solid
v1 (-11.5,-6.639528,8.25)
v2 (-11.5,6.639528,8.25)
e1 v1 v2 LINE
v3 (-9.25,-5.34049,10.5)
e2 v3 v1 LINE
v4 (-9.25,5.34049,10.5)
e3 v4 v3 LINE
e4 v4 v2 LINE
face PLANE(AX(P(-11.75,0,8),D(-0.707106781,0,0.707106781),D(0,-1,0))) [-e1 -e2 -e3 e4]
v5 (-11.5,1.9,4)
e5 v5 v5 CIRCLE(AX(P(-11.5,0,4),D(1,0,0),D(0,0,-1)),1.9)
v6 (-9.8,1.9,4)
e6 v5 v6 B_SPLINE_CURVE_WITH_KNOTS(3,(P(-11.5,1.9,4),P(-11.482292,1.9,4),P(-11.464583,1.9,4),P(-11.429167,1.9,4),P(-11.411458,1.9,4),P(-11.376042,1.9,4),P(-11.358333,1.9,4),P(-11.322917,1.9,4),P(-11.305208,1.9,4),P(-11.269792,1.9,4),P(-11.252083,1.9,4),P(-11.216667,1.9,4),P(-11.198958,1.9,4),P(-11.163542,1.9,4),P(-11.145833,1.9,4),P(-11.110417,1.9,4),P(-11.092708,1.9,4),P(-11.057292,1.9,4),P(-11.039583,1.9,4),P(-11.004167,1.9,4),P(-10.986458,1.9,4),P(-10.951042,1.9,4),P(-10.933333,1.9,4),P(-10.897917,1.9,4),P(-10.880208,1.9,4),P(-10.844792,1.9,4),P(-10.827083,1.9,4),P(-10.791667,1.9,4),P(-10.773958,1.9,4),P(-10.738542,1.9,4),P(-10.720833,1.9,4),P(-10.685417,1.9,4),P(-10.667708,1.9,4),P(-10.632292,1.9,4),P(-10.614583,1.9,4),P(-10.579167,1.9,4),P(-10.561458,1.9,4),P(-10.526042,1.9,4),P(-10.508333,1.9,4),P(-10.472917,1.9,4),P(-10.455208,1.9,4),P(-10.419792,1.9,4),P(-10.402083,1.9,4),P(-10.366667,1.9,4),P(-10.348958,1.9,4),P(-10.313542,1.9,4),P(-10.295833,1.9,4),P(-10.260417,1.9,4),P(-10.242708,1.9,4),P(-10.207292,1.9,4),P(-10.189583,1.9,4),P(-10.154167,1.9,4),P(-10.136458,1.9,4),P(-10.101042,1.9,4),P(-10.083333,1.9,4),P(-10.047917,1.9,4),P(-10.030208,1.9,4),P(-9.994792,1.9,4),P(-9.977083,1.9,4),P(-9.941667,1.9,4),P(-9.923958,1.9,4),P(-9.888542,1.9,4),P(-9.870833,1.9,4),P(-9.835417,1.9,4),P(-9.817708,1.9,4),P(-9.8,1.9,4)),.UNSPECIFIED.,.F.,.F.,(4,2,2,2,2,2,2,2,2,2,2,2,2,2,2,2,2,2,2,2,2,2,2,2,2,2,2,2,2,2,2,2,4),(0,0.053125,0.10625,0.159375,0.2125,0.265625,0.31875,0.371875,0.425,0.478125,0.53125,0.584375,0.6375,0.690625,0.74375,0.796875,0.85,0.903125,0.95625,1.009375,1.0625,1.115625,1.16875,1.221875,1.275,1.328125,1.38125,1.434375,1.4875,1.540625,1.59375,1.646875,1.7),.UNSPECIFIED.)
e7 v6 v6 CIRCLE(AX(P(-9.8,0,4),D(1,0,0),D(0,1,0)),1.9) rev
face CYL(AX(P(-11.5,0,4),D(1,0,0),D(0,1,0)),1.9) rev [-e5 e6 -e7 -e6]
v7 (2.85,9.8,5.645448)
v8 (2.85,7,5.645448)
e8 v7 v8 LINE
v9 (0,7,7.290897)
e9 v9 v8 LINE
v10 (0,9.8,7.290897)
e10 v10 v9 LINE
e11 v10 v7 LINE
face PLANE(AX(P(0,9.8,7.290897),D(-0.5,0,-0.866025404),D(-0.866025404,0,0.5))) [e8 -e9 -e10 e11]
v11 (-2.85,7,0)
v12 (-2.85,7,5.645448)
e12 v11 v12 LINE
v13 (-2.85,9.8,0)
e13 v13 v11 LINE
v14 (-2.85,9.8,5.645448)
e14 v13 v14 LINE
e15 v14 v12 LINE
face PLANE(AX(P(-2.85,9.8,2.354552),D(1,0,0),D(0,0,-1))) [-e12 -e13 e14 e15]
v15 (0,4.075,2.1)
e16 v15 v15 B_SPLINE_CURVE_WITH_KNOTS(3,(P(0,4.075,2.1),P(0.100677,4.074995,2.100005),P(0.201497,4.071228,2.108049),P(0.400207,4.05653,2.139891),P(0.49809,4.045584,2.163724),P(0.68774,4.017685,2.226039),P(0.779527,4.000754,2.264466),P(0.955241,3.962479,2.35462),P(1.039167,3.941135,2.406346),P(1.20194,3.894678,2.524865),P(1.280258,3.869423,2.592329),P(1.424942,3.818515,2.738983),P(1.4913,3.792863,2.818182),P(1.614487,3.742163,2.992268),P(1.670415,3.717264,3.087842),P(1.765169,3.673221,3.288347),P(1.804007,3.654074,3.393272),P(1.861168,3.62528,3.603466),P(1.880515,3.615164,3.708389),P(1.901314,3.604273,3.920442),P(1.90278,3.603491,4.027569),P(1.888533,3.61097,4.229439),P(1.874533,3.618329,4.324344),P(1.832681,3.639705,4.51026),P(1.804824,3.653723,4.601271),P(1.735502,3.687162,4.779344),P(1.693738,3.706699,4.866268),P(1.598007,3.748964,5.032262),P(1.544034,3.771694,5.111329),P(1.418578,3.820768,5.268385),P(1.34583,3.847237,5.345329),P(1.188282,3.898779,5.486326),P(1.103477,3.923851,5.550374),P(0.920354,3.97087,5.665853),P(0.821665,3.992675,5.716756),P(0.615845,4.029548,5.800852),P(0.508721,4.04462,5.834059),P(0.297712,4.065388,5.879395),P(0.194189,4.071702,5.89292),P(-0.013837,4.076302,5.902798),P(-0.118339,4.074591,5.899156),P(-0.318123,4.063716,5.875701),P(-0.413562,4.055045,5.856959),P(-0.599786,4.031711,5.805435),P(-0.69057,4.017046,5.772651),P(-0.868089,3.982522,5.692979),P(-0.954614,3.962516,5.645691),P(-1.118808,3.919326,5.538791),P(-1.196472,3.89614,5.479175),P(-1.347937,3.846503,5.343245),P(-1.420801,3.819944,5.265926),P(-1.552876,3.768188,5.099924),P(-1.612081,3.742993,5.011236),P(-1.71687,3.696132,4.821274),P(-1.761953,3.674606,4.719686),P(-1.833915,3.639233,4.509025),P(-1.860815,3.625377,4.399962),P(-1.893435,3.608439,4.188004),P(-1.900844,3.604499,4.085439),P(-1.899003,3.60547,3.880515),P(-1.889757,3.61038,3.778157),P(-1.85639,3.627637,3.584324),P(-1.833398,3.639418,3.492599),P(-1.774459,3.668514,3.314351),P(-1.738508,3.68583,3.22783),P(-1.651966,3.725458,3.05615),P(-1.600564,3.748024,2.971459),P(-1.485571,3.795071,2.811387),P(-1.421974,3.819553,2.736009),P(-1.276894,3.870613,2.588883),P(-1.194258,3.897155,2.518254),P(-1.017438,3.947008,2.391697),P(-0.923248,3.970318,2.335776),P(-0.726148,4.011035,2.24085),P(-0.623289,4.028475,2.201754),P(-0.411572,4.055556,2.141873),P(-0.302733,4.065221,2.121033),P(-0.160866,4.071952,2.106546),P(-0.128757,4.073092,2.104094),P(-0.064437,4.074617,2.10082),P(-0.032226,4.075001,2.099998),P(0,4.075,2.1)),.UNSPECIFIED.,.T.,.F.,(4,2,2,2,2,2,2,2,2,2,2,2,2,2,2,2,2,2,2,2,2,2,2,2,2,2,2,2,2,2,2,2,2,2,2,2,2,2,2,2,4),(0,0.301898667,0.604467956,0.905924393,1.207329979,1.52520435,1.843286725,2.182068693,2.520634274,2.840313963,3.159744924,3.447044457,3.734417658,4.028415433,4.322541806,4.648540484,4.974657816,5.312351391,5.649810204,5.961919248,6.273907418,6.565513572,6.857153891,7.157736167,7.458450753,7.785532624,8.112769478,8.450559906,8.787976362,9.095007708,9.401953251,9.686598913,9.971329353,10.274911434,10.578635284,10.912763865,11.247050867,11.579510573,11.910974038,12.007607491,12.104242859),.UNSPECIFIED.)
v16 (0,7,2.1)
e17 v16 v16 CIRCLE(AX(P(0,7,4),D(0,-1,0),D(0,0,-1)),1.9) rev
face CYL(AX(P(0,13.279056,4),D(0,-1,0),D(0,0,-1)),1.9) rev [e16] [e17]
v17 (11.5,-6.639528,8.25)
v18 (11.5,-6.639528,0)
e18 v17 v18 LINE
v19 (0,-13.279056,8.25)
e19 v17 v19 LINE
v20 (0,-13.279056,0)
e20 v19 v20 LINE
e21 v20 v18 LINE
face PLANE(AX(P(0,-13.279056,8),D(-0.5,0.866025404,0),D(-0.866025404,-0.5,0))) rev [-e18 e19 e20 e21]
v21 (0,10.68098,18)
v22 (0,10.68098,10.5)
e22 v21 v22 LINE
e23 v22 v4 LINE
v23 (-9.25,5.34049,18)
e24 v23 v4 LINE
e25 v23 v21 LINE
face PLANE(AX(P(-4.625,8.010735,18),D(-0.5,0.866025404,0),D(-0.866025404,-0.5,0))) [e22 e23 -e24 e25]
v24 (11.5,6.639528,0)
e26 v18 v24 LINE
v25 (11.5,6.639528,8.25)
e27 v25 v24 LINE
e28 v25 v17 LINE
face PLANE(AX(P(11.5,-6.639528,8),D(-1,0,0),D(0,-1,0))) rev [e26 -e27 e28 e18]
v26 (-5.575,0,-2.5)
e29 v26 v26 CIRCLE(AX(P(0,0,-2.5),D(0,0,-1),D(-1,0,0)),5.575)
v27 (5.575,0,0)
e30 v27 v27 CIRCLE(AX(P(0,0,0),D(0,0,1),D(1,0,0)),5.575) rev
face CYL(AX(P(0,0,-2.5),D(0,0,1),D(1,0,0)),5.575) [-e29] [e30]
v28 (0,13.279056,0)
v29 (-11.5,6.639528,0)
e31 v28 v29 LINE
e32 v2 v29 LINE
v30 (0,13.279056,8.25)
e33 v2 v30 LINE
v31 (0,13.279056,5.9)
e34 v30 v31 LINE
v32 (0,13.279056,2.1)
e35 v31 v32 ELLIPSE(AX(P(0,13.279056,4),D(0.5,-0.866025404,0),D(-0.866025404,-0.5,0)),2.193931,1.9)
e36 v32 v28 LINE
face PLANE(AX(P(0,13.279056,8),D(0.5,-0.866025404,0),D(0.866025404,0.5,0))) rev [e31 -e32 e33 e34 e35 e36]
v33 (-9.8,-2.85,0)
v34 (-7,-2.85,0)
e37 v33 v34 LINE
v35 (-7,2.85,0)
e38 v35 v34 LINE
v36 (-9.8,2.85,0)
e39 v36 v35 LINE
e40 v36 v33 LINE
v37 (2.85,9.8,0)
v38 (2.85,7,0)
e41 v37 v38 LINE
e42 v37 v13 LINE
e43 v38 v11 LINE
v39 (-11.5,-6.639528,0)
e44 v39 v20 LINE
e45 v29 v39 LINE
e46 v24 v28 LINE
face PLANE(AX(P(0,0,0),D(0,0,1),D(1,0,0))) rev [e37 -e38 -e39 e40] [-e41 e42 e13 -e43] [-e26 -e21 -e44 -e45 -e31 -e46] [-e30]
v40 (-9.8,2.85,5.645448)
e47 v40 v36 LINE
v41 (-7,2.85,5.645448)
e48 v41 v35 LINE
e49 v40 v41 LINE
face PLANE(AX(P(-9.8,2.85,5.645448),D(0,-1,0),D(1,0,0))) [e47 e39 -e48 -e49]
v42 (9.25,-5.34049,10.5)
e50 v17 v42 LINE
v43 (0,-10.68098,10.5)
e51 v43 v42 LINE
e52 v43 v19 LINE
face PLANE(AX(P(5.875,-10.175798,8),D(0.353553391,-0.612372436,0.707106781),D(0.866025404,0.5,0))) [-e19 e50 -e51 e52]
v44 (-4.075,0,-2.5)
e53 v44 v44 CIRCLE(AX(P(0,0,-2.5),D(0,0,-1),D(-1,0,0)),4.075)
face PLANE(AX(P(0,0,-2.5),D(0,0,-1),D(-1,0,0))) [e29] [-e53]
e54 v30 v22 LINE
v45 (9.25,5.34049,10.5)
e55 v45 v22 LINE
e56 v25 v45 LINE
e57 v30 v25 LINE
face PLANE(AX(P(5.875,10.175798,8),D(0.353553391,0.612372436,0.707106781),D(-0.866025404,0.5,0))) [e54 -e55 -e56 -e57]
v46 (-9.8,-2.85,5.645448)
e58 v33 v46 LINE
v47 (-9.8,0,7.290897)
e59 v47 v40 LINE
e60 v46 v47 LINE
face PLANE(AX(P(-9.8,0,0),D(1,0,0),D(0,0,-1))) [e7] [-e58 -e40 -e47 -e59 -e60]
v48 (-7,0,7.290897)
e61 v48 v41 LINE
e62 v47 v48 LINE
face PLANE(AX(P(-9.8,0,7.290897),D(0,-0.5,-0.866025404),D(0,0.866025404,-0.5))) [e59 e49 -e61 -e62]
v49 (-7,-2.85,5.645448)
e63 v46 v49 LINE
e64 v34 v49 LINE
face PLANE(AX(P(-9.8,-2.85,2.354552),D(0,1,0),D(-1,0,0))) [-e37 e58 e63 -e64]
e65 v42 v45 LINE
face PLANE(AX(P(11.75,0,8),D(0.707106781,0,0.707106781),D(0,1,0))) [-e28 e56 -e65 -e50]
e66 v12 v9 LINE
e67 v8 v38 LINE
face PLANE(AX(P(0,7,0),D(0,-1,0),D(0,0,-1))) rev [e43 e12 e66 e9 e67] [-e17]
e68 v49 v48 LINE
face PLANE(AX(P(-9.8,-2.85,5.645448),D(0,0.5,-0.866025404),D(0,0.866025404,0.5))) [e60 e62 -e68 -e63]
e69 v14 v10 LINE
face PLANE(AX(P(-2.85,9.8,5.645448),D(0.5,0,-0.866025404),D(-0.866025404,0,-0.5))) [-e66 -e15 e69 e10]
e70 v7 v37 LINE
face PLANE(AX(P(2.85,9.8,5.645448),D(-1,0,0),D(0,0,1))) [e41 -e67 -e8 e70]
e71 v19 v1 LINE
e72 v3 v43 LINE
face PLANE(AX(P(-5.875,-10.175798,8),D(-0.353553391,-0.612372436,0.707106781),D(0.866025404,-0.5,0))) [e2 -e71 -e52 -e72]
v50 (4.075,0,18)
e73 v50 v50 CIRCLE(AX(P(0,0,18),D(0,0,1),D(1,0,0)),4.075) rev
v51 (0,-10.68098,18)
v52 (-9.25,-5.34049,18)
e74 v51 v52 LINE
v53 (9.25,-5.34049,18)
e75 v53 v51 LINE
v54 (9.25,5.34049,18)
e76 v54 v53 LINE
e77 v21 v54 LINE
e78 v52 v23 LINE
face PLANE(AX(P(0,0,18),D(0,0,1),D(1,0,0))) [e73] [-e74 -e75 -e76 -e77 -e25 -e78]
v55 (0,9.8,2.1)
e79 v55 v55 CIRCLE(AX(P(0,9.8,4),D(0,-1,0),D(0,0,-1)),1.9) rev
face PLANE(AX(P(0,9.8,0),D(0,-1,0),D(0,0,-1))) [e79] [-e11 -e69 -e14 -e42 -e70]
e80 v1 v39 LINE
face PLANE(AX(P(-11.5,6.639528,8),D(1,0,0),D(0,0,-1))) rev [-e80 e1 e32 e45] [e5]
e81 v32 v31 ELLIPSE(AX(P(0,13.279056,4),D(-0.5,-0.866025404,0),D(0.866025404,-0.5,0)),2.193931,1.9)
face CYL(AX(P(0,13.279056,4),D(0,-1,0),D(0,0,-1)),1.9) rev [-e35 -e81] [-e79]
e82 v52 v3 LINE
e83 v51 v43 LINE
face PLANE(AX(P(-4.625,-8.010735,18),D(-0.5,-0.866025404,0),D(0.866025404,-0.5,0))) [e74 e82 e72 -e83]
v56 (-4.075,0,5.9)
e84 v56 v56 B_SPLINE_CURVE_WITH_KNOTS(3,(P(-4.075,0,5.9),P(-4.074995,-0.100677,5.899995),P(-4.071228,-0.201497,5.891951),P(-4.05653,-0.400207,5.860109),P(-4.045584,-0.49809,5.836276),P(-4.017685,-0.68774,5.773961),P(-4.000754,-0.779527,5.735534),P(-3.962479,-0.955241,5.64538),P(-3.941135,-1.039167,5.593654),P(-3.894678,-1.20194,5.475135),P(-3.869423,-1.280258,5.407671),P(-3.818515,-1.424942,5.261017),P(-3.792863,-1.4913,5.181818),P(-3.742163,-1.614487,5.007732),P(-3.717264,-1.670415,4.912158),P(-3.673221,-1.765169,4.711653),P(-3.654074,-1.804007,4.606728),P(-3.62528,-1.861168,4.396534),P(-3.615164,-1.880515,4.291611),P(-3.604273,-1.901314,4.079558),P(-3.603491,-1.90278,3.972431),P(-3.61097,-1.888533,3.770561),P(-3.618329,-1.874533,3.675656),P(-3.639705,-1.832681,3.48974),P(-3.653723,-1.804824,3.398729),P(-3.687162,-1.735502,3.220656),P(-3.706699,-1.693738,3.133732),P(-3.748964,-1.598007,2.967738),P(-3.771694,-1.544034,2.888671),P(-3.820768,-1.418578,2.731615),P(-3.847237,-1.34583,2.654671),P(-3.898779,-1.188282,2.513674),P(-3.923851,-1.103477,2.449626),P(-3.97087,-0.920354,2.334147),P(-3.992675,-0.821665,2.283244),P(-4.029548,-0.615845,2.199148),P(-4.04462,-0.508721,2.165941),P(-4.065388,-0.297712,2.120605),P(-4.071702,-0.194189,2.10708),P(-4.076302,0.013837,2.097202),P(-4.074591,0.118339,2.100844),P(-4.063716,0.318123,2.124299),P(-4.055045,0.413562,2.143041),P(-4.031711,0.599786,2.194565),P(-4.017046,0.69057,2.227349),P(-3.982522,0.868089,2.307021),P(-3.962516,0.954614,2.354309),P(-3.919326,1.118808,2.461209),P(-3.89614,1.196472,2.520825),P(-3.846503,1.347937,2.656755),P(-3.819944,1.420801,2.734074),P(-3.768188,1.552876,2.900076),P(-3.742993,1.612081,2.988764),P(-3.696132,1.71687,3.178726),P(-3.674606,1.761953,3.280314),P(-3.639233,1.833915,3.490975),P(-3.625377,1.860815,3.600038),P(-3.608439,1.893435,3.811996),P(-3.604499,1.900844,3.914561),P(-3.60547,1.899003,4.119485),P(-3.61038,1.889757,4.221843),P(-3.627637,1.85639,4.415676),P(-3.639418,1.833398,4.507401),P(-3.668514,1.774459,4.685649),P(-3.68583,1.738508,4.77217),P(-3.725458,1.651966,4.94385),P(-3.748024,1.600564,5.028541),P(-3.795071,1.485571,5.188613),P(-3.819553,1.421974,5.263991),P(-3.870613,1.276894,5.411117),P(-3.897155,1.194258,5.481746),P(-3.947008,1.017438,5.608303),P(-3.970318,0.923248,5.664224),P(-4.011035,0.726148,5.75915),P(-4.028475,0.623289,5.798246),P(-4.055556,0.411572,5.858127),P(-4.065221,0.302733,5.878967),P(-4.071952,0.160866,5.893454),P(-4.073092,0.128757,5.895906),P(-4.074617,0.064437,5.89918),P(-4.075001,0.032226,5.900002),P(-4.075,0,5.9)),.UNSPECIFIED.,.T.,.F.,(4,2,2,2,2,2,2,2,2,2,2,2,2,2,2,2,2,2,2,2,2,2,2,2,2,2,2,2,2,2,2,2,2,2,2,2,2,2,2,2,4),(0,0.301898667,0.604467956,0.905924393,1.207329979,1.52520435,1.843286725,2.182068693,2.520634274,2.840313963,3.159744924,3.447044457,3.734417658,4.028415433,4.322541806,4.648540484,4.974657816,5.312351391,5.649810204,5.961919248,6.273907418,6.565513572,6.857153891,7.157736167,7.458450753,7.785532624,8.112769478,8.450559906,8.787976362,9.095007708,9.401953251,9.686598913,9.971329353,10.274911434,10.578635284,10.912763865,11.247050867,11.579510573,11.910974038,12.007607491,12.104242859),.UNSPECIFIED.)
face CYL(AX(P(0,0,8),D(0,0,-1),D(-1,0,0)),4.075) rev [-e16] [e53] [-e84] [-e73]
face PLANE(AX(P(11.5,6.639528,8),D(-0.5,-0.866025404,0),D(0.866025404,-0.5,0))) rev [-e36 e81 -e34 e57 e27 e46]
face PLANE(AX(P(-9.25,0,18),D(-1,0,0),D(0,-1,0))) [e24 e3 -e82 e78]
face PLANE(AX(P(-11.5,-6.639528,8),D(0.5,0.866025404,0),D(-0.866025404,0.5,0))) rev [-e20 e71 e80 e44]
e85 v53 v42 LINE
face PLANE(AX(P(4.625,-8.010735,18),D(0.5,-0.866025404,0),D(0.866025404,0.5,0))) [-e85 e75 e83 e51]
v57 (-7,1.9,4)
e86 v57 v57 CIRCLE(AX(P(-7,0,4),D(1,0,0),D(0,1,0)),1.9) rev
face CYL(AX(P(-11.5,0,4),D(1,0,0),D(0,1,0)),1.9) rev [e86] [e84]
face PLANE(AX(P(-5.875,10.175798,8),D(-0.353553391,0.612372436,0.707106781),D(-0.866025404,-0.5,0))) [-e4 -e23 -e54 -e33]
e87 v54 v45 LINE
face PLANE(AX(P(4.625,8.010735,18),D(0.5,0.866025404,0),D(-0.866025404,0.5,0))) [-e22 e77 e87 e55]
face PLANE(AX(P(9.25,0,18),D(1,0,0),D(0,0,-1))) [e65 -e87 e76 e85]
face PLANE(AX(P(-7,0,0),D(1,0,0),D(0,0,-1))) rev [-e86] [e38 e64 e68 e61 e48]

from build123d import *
from build123d.topology import SkipClean

# Parameters (mm, degrees)
SKETCH2_R           = 4.075
BOSS_EXTRUDE2_DEPTH = 8
SKETCH18_R          = 4.075
BOSS_EXTRUDE4_DEPTH = 10
SKETCH5_R           = 1.9
CUT_EXTRUDE8_DEPTH  = 26.151209381
CUT_EXTRUDE7_DEPTH  = 2.8
CIRPATTERN1_COUNT   = 2
CIRPATTERN1_ANGLE   = 90
BOSS_EXTRUDE3_START = 2.5
SKETCH17_R          = 5.575
SKETCH17_R_2        = 4.075
BOSS_EXTRUDE3_DEPTH = 2.5
CHAMFER4_SIZE       = 2.5


with BuildPart() as part:
    # Sketch2 → Boss-Extrude2 (new body)
    with BuildSketch(Plane.XY):
        Polygon((11.5, -6.639528096), (11.5, 6.639528096), (0, 13.279056191), (-11.5, 6.639528096), (-11.5, -6.639528096), (0, -13.279056191), align=None)
        Circle(SKETCH2_R, mode=Mode.SUBTRACT)
    extrude(amount=BOSS_EXTRUDE2_DEPTH)

    # Sketch18 → Boss-Extrude4 (add)
    with BuildSketch(Plane(origin=(0, 0, 8), x_dir=(-1, 0, 0), z_dir=(0, 0, -1))):
        Polygon((-9.25, -5.34048999), (0, -10.68097998), (9.25, -5.34048999), (9.25, 5.34048999), (0, 10.68097998), (-9.25, 5.34048999), align=None)
        with Locations(Location((0, 0, 0), (0, 0, 180))):
            Circle(SKETCH18_R, mode=Mode.SUBTRACT)
    extrude(amount=-BOSS_EXTRUDE4_DEPTH)

    # Sketch5 → Cut-Extrude8 (cut, through all)
    with BuildSketch(Plane(origin=(0, 0, 0), x_dir=(0, 0, -1), z_dir=(0, -1, 0))):
        with Locations((-4, 0)):
            Circle(SKETCH5_R)
    cut_extrude8 = extrude(amount=-CUT_EXTRUDE8_DEPTH, mode=Mode.SUBTRACT)

    # Sketch16 → Cut-Extrude7 (cut)
    with BuildSketch(Plane(origin=(0, 7, 0), x_dir=(1, 0, 0), z_dir=(0, 1, 0))):
        Polygon((0, -7.290896534), (2.85, -5.645448267), (2.85, -2.354551733), (2.85, 0), (-2.85, 0), (-2.85, -2.354551733), (-2.85, -5.645448267), align=None)
    cut_extrude7 = extrude(amount=CUT_EXTRUDE7_DEPTH, mode=Mode.SUBTRACT)

    # CirPattern1: Cut-Extrude8, Cut-Extrude7 ×2 about axis
    cirpattern1_axis = Axis((0, 0, 0), (0, 0, 1))
    add([cut_extrude8.rotate(cirpattern1_axis, i * CIRPATTERN1_ANGLE / (CIRPATTERN1_COUNT - 1)) for i in range(1, CIRPATTERN1_COUNT)], mode=Mode.SUBTRACT)
    add([cut_extrude7.rotate(cirpattern1_axis, i * CIRPATTERN1_ANGLE / (CIRPATTERN1_COUNT - 1)) for i in range(1, CIRPATTERN1_COUNT)], mode=Mode.SUBTRACT)

    # Sketch17 → Boss-Extrude3 (add)
    with SkipClean():  # the faces are left unmerged after this step: merging them gives an invalid solid
        with BuildSketch(Plane(origin=(0, 0, 0), x_dir=(-1, 0, 0), z_dir=(0, 0, -1)).offset(BOSS_EXTRUDE3_START)):
            with Locations(Location((0, 0, 0), (0, 0, 180))):
                Circle(SKETCH17_R)
            Circle(SKETCH17_R_2, mode=Mode.SUBTRACT)
        extrude(amount=-BOSS_EXTRUDE3_DEPTH)

    # Chamfer4
    # the kernel refuses this chamfer: 2.5 mm, written as the material it adds along each edge
    with BuildSketch(Plane(origin=(14.817856995, -2.125886255, 8), x_dir=(0.49981095845564855, -0.8656979742248802, -0.0274958766105863), z_dir=(-0.8660254037844386, -0.5000000000000002, 0))) as chamfer4_piece_1_section:
        Polygon((CHAMFER4_SIZE * 0.999621916911, CHAMFER4_SIZE * 0.0274958766106), (-CHAMFER4_SIZE * 0.0274958766106, CHAMFER4_SIZE * 0.999621916911), (0, 0), align=None)
    chamfer4_piece_1 = extrude(amount=23.53939492, mode=Mode.PRIVATE)
    chamfer4_piece_1 = split(chamfer4_piece_1, bisect_by=Plane(origin=(5.75, -9.959292144, 8.862467682), z_dir=(-0.5000000000000001, 0.8660254037844386, 0)), keep=Keep.TOP, mode=Mode.PRIVATE)
    chamfer4_piece_1 = split(chamfer4_piece_1, bisect_by=Plane(origin=(9.25, -8.662876539, 8.862467682), z_dir=(-1, 0, 0)), keep=Keep.TOP, mode=Mode.PRIVATE)
    chamfer4_piece_1 = split(chamfer4_piece_1, bisect_by=Plane(origin=(2.877271152, -12.342173254, 8.862467682), z_dir=(0.5000000000000001, 0.8660254037844387, 0)), keep=Keep.TOP, mode=Mode.PRIVATE)
    add(chamfer4_piece_1)
    with BuildSketch(Plane(origin=(5.567856995, -13.895583715, 8), x_dir=(-0.4998109584556484, -0.8656979742248803, -0.027495876610586313), z_dir=(-0.8660254037844387, 0.5000000000000001, 0))) as chamfer4_piece_2_section:
        Polygon((CHAMFER4_SIZE * 0.999621916911, CHAMFER4_SIZE * 0.0274958766106), (-CHAMFER4_SIZE * 0.0274958766106, CHAMFER4_SIZE * 0.999621916911), (0, 0), align=None)
    chamfer4_piece_2 = extrude(amount=23.53939492, mode=Mode.PRIVATE)
    chamfer4_piece_2 = split(chamfer4_piece_2, bisect_by=Plane(origin=(-5.75, -9.959292144, 8.862467682), z_dir=(0.5000000000000002, 0.8660254037844386, 0)), keep=Keep.TOP, mode=Mode.PRIVATE)
    chamfer4_piece_2 = split(chamfer4_piece_2, bisect_by=Plane(origin=(-9.25, -8.662876539, 8.862467682), z_dir=(1, 0, 0)), keep=Keep.TOP, mode=Mode.PRIVATE)
    chamfer4_piece_2 = split(chamfer4_piece_2, bisect_by=Plane(origin=(-2.877271152, -12.342173254, 8.862467682), z_dir=(-0.5000000000000002, 0.8660254037844386, 0)), keep=Keep.TOP, mode=Mode.PRIVATE)
    add(chamfer4_piece_2)
    with BuildSketch(Plane(origin=(-9.25, -11.76969746, 8), x_dir=(-0.9996219169112968, 0, -0.027495876610586317), z_dir=(0, 1, 0))) as chamfer4_piece_3_section:
        Polygon((CHAMFER4_SIZE * 0.999621916911, CHAMFER4_SIZE * 0.0274958766106), (-CHAMFER4_SIZE * 0.0274958766106, CHAMFER4_SIZE * 0.999621916911), (0, 0), align=None)
    chamfer4_piece_3 = extrude(amount=23.53939492, mode=Mode.PRIVATE)
    chamfer4_piece_3 = split(chamfer4_piece_3, bisect_by=Plane(origin=(-11.5, 0, 8.862467682), z_dir=(1, 0, 0)), keep=Keep.TOP, mode=Mode.PRIVATE)
    chamfer4_piece_3 = split(chamfer4_piece_3, bisect_by=Plane(origin=(-12.127271152, 3.679296716, 8.862467682), z_dir=(0.5, -0.8660254037844387, 0)), keep=Keep.TOP, mode=Mode.PRIVATE)
    chamfer4_piece_3 = split(chamfer4_piece_3, bisect_by=Plane(origin=(-12.127271152, -3.679296716, 8.862467682), z_dir=(0.5000000000000001, 0.8660254037844387, 0)), keep=Keep.TOP, mode=Mode.PRIVATE)
    add(chamfer4_piece_3)
    with BuildSketch(Plane(origin=(-14.817856995, 2.125886255, 8), x_dir=(-0.49981095845564827, 0.8656979742248804, -0.027495876610586303), z_dir=(0.8660254037844387, 0.5, 0))) as chamfer4_piece_4_section:
        Polygon((CHAMFER4_SIZE * 0.999621916911, CHAMFER4_SIZE * 0.0274958766106), (-CHAMFER4_SIZE * 0.0274958766106, CHAMFER4_SIZE * 0.999621916911), (0, 0), align=None)
    chamfer4_piece_4 = extrude(amount=23.53939492, mode=Mode.PRIVATE)
    chamfer4_piece_4 = split(chamfer4_piece_4, bisect_by=Plane(origin=(-5.75, 9.959292144, 8.862467682), z_dir=(0.49999999999999983, -0.8660254037844388, 0)), keep=Keep.TOP, mode=Mode.PRIVATE)
    chamfer4_piece_4 = split(chamfer4_piece_4, bisect_by=Plane(origin=(-2.877271152, 12.342173254, 8.862467682), z_dir=(-0.5, -0.8660254037844387, 0)), keep=Keep.TOP, mode=Mode.PRIVATE)
    chamfer4_piece_4 = split(chamfer4_piece_4, bisect_by=Plane(origin=(-9.25, 8.662876539, 8.862467682), z_dir=(1, 0, 0)), keep=Keep.TOP, mode=Mode.PRIVATE)
    add(chamfer4_piece_4)
    with BuildSketch(Plane(origin=(-5.567856995, 13.895583715, 8), x_dir=(0.4998109584556484, 0.8656979742248804, -0.027495876610586317), z_dir=(0.8660254037844387, -0.5, 0))) as chamfer4_piece_5_section:
        Polygon((CHAMFER4_SIZE * 0.999621916911, CHAMFER4_SIZE * 0.0274958766106), (-CHAMFER4_SIZE * 0.0274958766106, CHAMFER4_SIZE * 0.999621916911), (0, 0), align=None)
    chamfer4_piece_5 = extrude(amount=23.53939492, mode=Mode.PRIVATE)
    chamfer4_piece_5 = split(chamfer4_piece_5, bisect_by=Plane(origin=(5.75, 9.959292144, 8.862467682), z_dir=(-0.49999999999999983, -0.8660254037844388, 0)), keep=Keep.TOP, mode=Mode.PRIVATE)
    chamfer4_piece_5 = split(chamfer4_piece_5, bisect_by=Plane(origin=(9.25, 8.662876539, 8.862467682), z_dir=(-1, 0, 0)), keep=Keep.TOP, mode=Mode.PRIVATE)
    chamfer4_piece_5 = split(chamfer4_piece_5, bisect_by=Plane(origin=(2.877271152, 12.342173254, 8.862467682), z_dir=(0.5, -0.8660254037844387, 0)), keep=Keep.TOP, mode=Mode.PRIVATE)
    add(chamfer4_piece_5)
    with BuildSketch(Plane(origin=(9.25, 11.76969746, 8), x_dir=(0.9996219169112968, 0, -0.027495876610586317), z_dir=(0, -1, 0))) as chamfer4_piece_6_section:
        Polygon((CHAMFER4_SIZE * 0.999621916911, CHAMFER4_SIZE * 0.0274958766106), (-CHAMFER4_SIZE * 0.0274958766106, CHAMFER4_SIZE * 0.999621916911), (0, 0), align=None)
    chamfer4_piece_6 = extrude(amount=23.53939492, mode=Mode.PRIVATE)
    chamfer4_piece_6 = split(chamfer4_piece_6, bisect_by=Plane(origin=(11.5, 0, 8.862467682), z_dir=(-1, 0, 0)), keep=Keep.TOP, mode=Mode.PRIVATE)
    chamfer4_piece_6 = split(chamfer4_piece_6, bisect_by=Plane(origin=(12.127271152, 3.679296716, 8.862467682), z_dir=(-0.5, -0.8660254037844387, 0)), keep=Keep.TOP, mode=Mode.PRIVATE)
    chamfer4_piece_6 = split(chamfer4_piece_6, bisect_by=Plane(origin=(12.127271152, -3.679296716, 8.862467682), z_dir=(-0.5000000000000002, 0.8660254037844386, 0)), keep=Keep.TOP, mode=Mode.PRIVATE)
    add(chamfer4_piece_6)
    with BuildSketch(Plane(origin=(9.25, 11.76969746, 8), x_dir=(0.9996219169112968, 0, -0.027495876610586317), z_dir=(0, -1, 0))) as chamfer4_piece_7a_section:
        Polygon((CHAMFER4_SIZE * 0.999621916911, CHAMFER4_SIZE * 0.0274958766106), (-CHAMFER4_SIZE * 0.0274958766106, CHAMFER4_SIZE * 0.999621916911), (0, 0), align=None)
    chamfer4_piece_7a = extrude(amount=23.53939492, mode=Mode.PRIVATE)
    chamfer4_piece_7a = split(chamfer4_piece_7a, bisect_by=Plane(origin=(11.5, -6.180288519, 8.839751868), z_dir=(-1, 0, 0)), keep=Keep.TOP, mode=Mode.PRIVATE)
    chamfer4_piece_7a = split(chamfer4_piece_7a, bisect_by=Plane(origin=(10.60792628, -7.154567098, 8.839751868), z_dir=(-0.5000000000000001, 0.8660254037844386, 0)), keep=Keep.TOP, mode=Mode.PRIVATE)
    chamfer4_piece_7a = split(chamfer4_piece_7a, bisect_by=Plane(origin=(9.48292628, -5.20600994, 8.839751868), z_dir=(0.5000000000000002, -0.8660254037844386, 0)), keep=Keep.TOP, mode=Mode.PRIVATE)
    with BuildSketch(Plane(origin=(14.817856995, -2.125886255, 8), x_dir=(0.49981095845564855, -0.8656979742248802, -0.0274958766105863), z_dir=(-0.8660254037844386, -0.5000000000000002, 0))) as chamfer4_piece_7b_section:
        Polygon((CHAMFER4_SIZE * 0.999621916911, CHAMFER4_SIZE * 0.0274958766106), (-CHAMFER4_SIZE * 0.0274958766106, CHAMFER4_SIZE * 0.999621916911), (0, 0), align=None)
    chamfer4_piece_7b = extrude(amount=23.53939492, mode=Mode.PRIVATE)
    chamfer4_piece_7b = split(chamfer4_piece_7b, bisect_by=Plane(origin=(11.5, -5.609450091, 8.839751868), z_dir=(-1, 0, 0)), keep=Keep.TOP, mode=Mode.PRIVATE)
    chamfer4_piece_7b = split(chamfer4_piece_7b, bisect_by=Plane(origin=(11.10228686, -6.869147884, 8.839751868), z_dir=(-0.5000000000000001, 0.8660254037844386, 0)), keep=Keep.TOP, mode=Mode.PRIVATE)
    chamfer4_piece_7b = split(chamfer4_piece_7b, bisect_by=Plane(origin=(9.25, -5.609450091, 8.839751868), z_dir=(1, 0, 0)), keep=Keep.TOP, mode=Mode.PRIVATE)
    chamfer4_piece_7 = chamfer4_piece_7a & chamfer4_piece_7b
    add(chamfer4_piece_7)
    with BuildSketch(Plane(origin=(5.567856995, -13.895583715, 8), x_dir=(-0.4998109584556484, -0.8656979742248803, -0.027495876610586313), z_dir=(-0.8660254037844387, 0.5000000000000001, 0))) as chamfer4_piece_8a_section:
        Polygon((CHAMFER4_SIZE * 0.999621916911, CHAMFER4_SIZE * 0.0274958766106), (-CHAMFER4_SIZE * 0.0274958766106, CHAMFER4_SIZE * 0.999621916911), (0, 0), align=None)
    chamfer4_piece_8a = extrude(amount=23.53939492, mode=Mode.PRIVATE)
    chamfer4_piece_8a = split(chamfer4_piece_8a, bisect_by=Plane(origin=(0.89207372, -12.764017189, 8.839751868), z_dir=(-0.5000000000000001, 0.8660254037844386, 0)), keep=Keep.TOP, mode=Mode.PRIVATE)
    chamfer4_piece_8a = split(chamfer4_piece_8a, bisect_by=Plane(origin=(-0.39771314, -13.049436403, 8.839751868), z_dir=(0.5000000000000002, 0.8660254037844386, 0)), keep=Keep.TOP, mode=Mode.PRIVATE)
    chamfer4_piece_8a = split(chamfer4_piece_8a, bisect_by=Plane(origin=(-0.23292628, -10.81546003, 8.839751868), z_dir=(0.5000000000000002, -0.8660254037844386, 0)), keep=Keep.TOP, mode=Mode.PRIVATE)
    with BuildSketch(Plane(origin=(14.817856995, -2.125886255, 8), x_dir=(0.49981095845564855, -0.8656979742248802, -0.0274958766105863), z_dir=(-0.8660254037844386, -0.5000000000000002, 0))) as chamfer4_piece_8b_section:
        Polygon((CHAMFER4_SIZE * 0.999621916911, CHAMFER4_SIZE * 0.0274958766106), (-CHAMFER4_SIZE * 0.0274958766106, CHAMFER4_SIZE * 0.999621916911), (0, 0), align=None)
    chamfer4_piece_8b = extrude(amount=23.53939492, mode=Mode.PRIVATE)
    chamfer4_piece_8b = split(chamfer4_piece_8b, bisect_by=Plane(origin=(0.39771314, -13.049436403, 8.839751868), z_dir=(-0.5000000000000001, 0.8660254037844386, 0)), keep=Keep.TOP, mode=Mode.PRIVATE)
    chamfer4_piece_8b = split(chamfer4_piece_8b, bisect_by=Plane(origin=(-0.89207372, -12.764017189, 8.839751868), z_dir=(0.5000000000000002, 0.8660254037844386, 0)), keep=Keep.TOP, mode=Mode.PRIVATE)
    chamfer4_piece_8b = split(chamfer4_piece_8b, bisect_by=Plane(origin=(0.23292628, -10.81546003, 8.839751868), z_dir=(-0.5000000000000001, -0.8660254037844387, 0)), keep=Keep.TOP, mode=Mode.PRIVATE)
    chamfer4_piece_8 = chamfer4_piece_8a & chamfer4_piece_8b
    add(chamfer4_piece_8)
    with BuildSketch(Plane(origin=(-9.25, -11.76969746, 8), x_dir=(-0.9996219169112968, 0, -0.027495876610586317), z_dir=(0, 1, 0))) as chamfer4_piece_9a_section:
        Polygon((CHAMFER4_SIZE * 0.999621916911, CHAMFER4_SIZE * 0.0274958766106), (-CHAMFER4_SIZE * 0.0274958766106, CHAMFER4_SIZE * 0.999621916911), (0, 0), align=None)
    chamfer4_piece_9a = extrude(amount=23.53939492, mode=Mode.PRIVATE)
    chamfer4_piece_9a = split(chamfer4_piece_9a, bisect_by=Plane(origin=(-10.60792628, -7.154567098, 8.839751868), z_dir=(0.5000000000000002, 0.8660254037844386, 0)), keep=Keep.TOP, mode=Mode.PRIVATE)
    chamfer4_piece_9a = split(chamfer4_piece_9a, bisect_by=Plane(origin=(-11.5, -6.180288519, 8.839751868), z_dir=(1, 0, 0)), keep=Keep.TOP, mode=Mode.PRIVATE)
    chamfer4_piece_9a = split(chamfer4_piece_9a, bisect_by=Plane(origin=(-9.48292628, -5.20600994, 8.839751868), z_dir=(-0.5000000000000001, -0.8660254037844387, 0)), keep=Keep.TOP, mode=Mode.PRIVATE)
    with BuildSketch(Plane(origin=(5.567856995, -13.895583715, 8), x_dir=(-0.4998109584556484, -0.8656979742248803, -0.027495876610586313), z_dir=(-0.8660254037844387, 0.5000000000000001, 0))) as chamfer4_piece_9b_section:
        Polygon((CHAMFER4_SIZE * 0.999621916911, CHAMFER4_SIZE * 0.0274958766106), (-CHAMFER4_SIZE * 0.0274958766106, CHAMFER4_SIZE * 0.999621916911), (0, 0), align=None)
    chamfer4_piece_9b = extrude(amount=23.53939492, mode=Mode.PRIVATE)
    chamfer4_piece_9b = split(chamfer4_piece_9b, bisect_by=Plane(origin=(-11.10228686, -6.869147884, 8.839751868), z_dir=(0.5000000000000002, 0.8660254037844386, 0)), keep=Keep.TOP, mode=Mode.PRIVATE)
    chamfer4_piece_9b = split(chamfer4_piece_9b, bisect_by=Plane(origin=(-11.5, -5.609450091, 8.839751868), z_dir=(1, 0, 0)), keep=Keep.TOP, mode=Mode.PRIVATE)
    chamfer4_piece_9b = split(chamfer4_piece_9b, bisect_by=Plane(origin=(-9.25, -5.609450091, 8.839751868), z_dir=(-1, 0, 0)), keep=Keep.TOP, mode=Mode.PRIVATE)
    chamfer4_piece_9 = chamfer4_piece_9a & chamfer4_piece_9b
    add(chamfer4_piece_9)
    with BuildSketch(Plane(origin=(-14.817856995, 2.125886255, 8), x_dir=(-0.49981095845564827, 0.8656979742248804, -0.027495876610586303), z_dir=(0.8660254037844387, 0.5, 0))) as chamfer4_piece_10a_section:
        Polygon((CHAMFER4_SIZE * 0.999621916911, CHAMFER4_SIZE * 0.0274958766106), (-CHAMFER4_SIZE * 0.0274958766106, CHAMFER4_SIZE * 0.999621916911), (0, 0), align=None)
    chamfer4_piece_10a = extrude(amount=23.53939492, mode=Mode.PRIVATE)
    chamfer4_piece_10a = split(chamfer4_piece_10a, bisect_by=Plane(origin=(-11.10228686, 6.869147884, 8.839751868), z_dir=(0.49999999999999983, -0.8660254037844388, 0)), keep=Keep.TOP, mode=Mode.PRIVATE)
    chamfer4_piece_10a = split(chamfer4_piece_10a, bisect_by=Plane(origin=(-11.5, 5.609450091, 8.839751868), z_dir=(1, 0, 0)), keep=Keep.TOP, mode=Mode.PRIVATE)
    chamfer4_piece_10a = split(chamfer4_piece_10a, bisect_by=Plane(origin=(-9.25, 5.609450091, 8.839751868), z_dir=(-1, 0, 0)), keep=Keep.TOP, mode=Mode.PRIVATE)
    with BuildSketch(Plane(origin=(-9.25, -11.76969746, 8), x_dir=(-0.9996219169112968, 0, -0.027495876610586317), z_dir=(0, 1, 0))) as chamfer4_piece_10b_section:
        Polygon((CHAMFER4_SIZE * 0.999621916911, CHAMFER4_SIZE * 0.0274958766106), (-CHAMFER4_SIZE * 0.0274958766106, CHAMFER4_SIZE * 0.999621916911), (0, 0), align=None)
    chamfer4_piece_10b = extrude(amount=23.53939492, mode=Mode.PRIVATE)
    chamfer4_piece_10b = split(chamfer4_piece_10b, bisect_by=Plane(origin=(-10.60792628, 7.154567098, 8.839751868), z_dir=(0.49999999999999983, -0.8660254037844388, 0)), keep=Keep.TOP, mode=Mode.PRIVATE)
    chamfer4_piece_10b = split(chamfer4_piece_10b, bisect_by=Plane(origin=(-11.5, 6.180288519, 8.839751868), z_dir=(1, 0, 0)), keep=Keep.TOP, mode=Mode.PRIVATE)
    chamfer4_piece_10b = split(chamfer4_piece_10b, bisect_by=Plane(origin=(-9.48292628, 5.20600994, 8.839751868), z_dir=(-0.5, 0.8660254037844387, 0)), keep=Keep.TOP, mode=Mode.PRIVATE)
    chamfer4_piece_10 = chamfer4_piece_10a & chamfer4_piece_10b
    add(chamfer4_piece_10)
    with BuildSketch(Plane(origin=(-5.567856995, 13.895583715, 8), x_dir=(0.4998109584556484, 0.8656979742248804, -0.027495876610586317), z_dir=(0.8660254037844387, -0.5, 0))) as chamfer4_piece_11a_section:
        Polygon((CHAMFER4_SIZE * 0.999621916911, CHAMFER4_SIZE * 0.0274958766106), (-CHAMFER4_SIZE * 0.0274958766106, CHAMFER4_SIZE * 0.999621916911), (0, 0), align=None)
    chamfer4_piece_11a = extrude(amount=23.53939492, mode=Mode.PRIVATE)
    chamfer4_piece_11a = split(chamfer4_piece_11a, bisect_by=Plane(origin=(0.39771314, 13.049436403, 8.839751868), z_dir=(-0.49999999999999983, -0.8660254037844388, 0)), keep=Keep.TOP, mode=Mode.PRIVATE)
    chamfer4_piece_11a = split(chamfer4_piece_11a, bisect_by=Plane(origin=(-0.89207372, 12.764017189, 8.839751868), z_dir=(0.49999999999999983, -0.8660254037844388, 0)), keep=Keep.TOP, mode=Mode.PRIVATE)
    chamfer4_piece_11a = split(chamfer4_piece_11a, bisect_by=Plane(origin=(0.23292628, 10.81546003, 8.839751868), z_dir=(-0.5, 0.8660254037844387, 0)), keep=Keep.TOP, mode=Mode.PRIVATE)
    with BuildSketch(Plane(origin=(-14.817856995, 2.125886255, 8), x_dir=(-0.49981095845564827, 0.8656979742248804, -0.027495876610586303), z_dir=(0.8660254037844387, 0.5, 0))) as chamfer4_piece_11b_section:
        Polygon((CHAMFER4_SIZE * 0.999621916911, CHAMFER4_SIZE * 0.0274958766106), (-CHAMFER4_SIZE * 0.0274958766106, CHAMFER4_SIZE * 0.999621916911), (0, 0), align=None)
    chamfer4_piece_11b = extrude(amount=23.53939492, mode=Mode.PRIVATE)
    chamfer4_piece_11b = split(chamfer4_piece_11b, bisect_by=Plane(origin=(0.89207372, 12.764017189, 8.839751868), z_dir=(-0.49999999999999983, -0.8660254037844388, 0)), keep=Keep.TOP, mode=Mode.PRIVATE)
    chamfer4_piece_11b = split(chamfer4_piece_11b, bisect_by=Plane(origin=(-0.39771314, 13.049436403, 8.839751868), z_dir=(0.49999999999999983, -0.8660254037844388, 0)), keep=Keep.TOP, mode=Mode.PRIVATE)
    chamfer4_piece_11b = split(chamfer4_piece_11b, bisect_by=Plane(origin=(-0.23292628, 10.81546003, 8.839751868), z_dir=(0.5, 0.8660254037844387, 0)), keep=Keep.TOP, mode=Mode.PRIVATE)
    chamfer4_piece_11 = chamfer4_piece_11a & chamfer4_piece_11b
    add(chamfer4_piece_11)
    with BuildSketch(Plane(origin=(9.25, 11.76969746, 8), x_dir=(0.9996219169112968, 0, -0.027495876610586317), z_dir=(0, -1, 0))) as chamfer4_piece_12a_section:
        Polygon((CHAMFER4_SIZE * 0.999621916911, CHAMFER4_SIZE * 0.0274958766106), (-CHAMFER4_SIZE * 0.0274958766106, CHAMFER4_SIZE * 0.999621916911), (0, 0), align=None)
    chamfer4_piece_12a = extrude(amount=23.53939492, mode=Mode.PRIVATE)
    chamfer4_piece_12a = split(chamfer4_piece_12a, bisect_by=Plane(origin=(11.5, 6.180288519, 8.839751868), z_dir=(-1, 0, 0)), keep=Keep.TOP, mode=Mode.PRIVATE)
    chamfer4_piece_12a = split(chamfer4_piece_12a, bisect_by=Plane(origin=(10.60792628, 7.154567098, 8.839751868), z_dir=(-0.49999999999999983, -0.8660254037844388, 0)), keep=Keep.TOP, mode=Mode.PRIVATE)
    chamfer4_piece_12a = split(chamfer4_piece_12a, bisect_by=Plane(origin=(9.48292628, 5.20600994, 8.839751868), z_dir=(0.5, 0.8660254037844387, 0)), keep=Keep.TOP, mode=Mode.PRIVATE)
    with BuildSketch(Plane(origin=(-5.567856995, 13.895583715, 8), x_dir=(0.4998109584556484, 0.8656979742248804, -0.027495876610586317), z_dir=(0.8660254037844387, -0.5, 0))) as chamfer4_piece_12b_section:
        Polygon((CHAMFER4_SIZE * 0.999621916911, CHAMFER4_SIZE * 0.0274958766106), (-CHAMFER4_SIZE * 0.0274958766106, CHAMFER4_SIZE * 0.999621916911), (0, 0), align=None)
    chamfer4_piece_12b = extrude(amount=23.53939492, mode=Mode.PRIVATE)
    chamfer4_piece_12b = split(chamfer4_piece_12b, bisect_by=Plane(origin=(11.5, 5.609450091, 8.839751868), z_dir=(-1, 0, 0)), keep=Keep.TOP, mode=Mode.PRIVATE)
    chamfer4_piece_12b = split(chamfer4_piece_12b, bisect_by=Plane(origin=(11.10228686, 6.869147884, 8.839751868), z_dir=(-0.49999999999999983, -0.8660254037844388, 0)), keep=Keep.TOP, mode=Mode.PRIVATE)
    chamfer4_piece_12b = split(chamfer4_piece_12b, bisect_by=Plane(origin=(9.25, 5.609450091, 8.839751868), z_dir=(1, 0, 0)), keep=Keep.TOP, mode=Mode.PRIVATE)
    chamfer4_piece_12 = chamfer4_piece_12a & chamfer4_piece_12b
    add(chamfer4_piece_12)


solid = part.part
